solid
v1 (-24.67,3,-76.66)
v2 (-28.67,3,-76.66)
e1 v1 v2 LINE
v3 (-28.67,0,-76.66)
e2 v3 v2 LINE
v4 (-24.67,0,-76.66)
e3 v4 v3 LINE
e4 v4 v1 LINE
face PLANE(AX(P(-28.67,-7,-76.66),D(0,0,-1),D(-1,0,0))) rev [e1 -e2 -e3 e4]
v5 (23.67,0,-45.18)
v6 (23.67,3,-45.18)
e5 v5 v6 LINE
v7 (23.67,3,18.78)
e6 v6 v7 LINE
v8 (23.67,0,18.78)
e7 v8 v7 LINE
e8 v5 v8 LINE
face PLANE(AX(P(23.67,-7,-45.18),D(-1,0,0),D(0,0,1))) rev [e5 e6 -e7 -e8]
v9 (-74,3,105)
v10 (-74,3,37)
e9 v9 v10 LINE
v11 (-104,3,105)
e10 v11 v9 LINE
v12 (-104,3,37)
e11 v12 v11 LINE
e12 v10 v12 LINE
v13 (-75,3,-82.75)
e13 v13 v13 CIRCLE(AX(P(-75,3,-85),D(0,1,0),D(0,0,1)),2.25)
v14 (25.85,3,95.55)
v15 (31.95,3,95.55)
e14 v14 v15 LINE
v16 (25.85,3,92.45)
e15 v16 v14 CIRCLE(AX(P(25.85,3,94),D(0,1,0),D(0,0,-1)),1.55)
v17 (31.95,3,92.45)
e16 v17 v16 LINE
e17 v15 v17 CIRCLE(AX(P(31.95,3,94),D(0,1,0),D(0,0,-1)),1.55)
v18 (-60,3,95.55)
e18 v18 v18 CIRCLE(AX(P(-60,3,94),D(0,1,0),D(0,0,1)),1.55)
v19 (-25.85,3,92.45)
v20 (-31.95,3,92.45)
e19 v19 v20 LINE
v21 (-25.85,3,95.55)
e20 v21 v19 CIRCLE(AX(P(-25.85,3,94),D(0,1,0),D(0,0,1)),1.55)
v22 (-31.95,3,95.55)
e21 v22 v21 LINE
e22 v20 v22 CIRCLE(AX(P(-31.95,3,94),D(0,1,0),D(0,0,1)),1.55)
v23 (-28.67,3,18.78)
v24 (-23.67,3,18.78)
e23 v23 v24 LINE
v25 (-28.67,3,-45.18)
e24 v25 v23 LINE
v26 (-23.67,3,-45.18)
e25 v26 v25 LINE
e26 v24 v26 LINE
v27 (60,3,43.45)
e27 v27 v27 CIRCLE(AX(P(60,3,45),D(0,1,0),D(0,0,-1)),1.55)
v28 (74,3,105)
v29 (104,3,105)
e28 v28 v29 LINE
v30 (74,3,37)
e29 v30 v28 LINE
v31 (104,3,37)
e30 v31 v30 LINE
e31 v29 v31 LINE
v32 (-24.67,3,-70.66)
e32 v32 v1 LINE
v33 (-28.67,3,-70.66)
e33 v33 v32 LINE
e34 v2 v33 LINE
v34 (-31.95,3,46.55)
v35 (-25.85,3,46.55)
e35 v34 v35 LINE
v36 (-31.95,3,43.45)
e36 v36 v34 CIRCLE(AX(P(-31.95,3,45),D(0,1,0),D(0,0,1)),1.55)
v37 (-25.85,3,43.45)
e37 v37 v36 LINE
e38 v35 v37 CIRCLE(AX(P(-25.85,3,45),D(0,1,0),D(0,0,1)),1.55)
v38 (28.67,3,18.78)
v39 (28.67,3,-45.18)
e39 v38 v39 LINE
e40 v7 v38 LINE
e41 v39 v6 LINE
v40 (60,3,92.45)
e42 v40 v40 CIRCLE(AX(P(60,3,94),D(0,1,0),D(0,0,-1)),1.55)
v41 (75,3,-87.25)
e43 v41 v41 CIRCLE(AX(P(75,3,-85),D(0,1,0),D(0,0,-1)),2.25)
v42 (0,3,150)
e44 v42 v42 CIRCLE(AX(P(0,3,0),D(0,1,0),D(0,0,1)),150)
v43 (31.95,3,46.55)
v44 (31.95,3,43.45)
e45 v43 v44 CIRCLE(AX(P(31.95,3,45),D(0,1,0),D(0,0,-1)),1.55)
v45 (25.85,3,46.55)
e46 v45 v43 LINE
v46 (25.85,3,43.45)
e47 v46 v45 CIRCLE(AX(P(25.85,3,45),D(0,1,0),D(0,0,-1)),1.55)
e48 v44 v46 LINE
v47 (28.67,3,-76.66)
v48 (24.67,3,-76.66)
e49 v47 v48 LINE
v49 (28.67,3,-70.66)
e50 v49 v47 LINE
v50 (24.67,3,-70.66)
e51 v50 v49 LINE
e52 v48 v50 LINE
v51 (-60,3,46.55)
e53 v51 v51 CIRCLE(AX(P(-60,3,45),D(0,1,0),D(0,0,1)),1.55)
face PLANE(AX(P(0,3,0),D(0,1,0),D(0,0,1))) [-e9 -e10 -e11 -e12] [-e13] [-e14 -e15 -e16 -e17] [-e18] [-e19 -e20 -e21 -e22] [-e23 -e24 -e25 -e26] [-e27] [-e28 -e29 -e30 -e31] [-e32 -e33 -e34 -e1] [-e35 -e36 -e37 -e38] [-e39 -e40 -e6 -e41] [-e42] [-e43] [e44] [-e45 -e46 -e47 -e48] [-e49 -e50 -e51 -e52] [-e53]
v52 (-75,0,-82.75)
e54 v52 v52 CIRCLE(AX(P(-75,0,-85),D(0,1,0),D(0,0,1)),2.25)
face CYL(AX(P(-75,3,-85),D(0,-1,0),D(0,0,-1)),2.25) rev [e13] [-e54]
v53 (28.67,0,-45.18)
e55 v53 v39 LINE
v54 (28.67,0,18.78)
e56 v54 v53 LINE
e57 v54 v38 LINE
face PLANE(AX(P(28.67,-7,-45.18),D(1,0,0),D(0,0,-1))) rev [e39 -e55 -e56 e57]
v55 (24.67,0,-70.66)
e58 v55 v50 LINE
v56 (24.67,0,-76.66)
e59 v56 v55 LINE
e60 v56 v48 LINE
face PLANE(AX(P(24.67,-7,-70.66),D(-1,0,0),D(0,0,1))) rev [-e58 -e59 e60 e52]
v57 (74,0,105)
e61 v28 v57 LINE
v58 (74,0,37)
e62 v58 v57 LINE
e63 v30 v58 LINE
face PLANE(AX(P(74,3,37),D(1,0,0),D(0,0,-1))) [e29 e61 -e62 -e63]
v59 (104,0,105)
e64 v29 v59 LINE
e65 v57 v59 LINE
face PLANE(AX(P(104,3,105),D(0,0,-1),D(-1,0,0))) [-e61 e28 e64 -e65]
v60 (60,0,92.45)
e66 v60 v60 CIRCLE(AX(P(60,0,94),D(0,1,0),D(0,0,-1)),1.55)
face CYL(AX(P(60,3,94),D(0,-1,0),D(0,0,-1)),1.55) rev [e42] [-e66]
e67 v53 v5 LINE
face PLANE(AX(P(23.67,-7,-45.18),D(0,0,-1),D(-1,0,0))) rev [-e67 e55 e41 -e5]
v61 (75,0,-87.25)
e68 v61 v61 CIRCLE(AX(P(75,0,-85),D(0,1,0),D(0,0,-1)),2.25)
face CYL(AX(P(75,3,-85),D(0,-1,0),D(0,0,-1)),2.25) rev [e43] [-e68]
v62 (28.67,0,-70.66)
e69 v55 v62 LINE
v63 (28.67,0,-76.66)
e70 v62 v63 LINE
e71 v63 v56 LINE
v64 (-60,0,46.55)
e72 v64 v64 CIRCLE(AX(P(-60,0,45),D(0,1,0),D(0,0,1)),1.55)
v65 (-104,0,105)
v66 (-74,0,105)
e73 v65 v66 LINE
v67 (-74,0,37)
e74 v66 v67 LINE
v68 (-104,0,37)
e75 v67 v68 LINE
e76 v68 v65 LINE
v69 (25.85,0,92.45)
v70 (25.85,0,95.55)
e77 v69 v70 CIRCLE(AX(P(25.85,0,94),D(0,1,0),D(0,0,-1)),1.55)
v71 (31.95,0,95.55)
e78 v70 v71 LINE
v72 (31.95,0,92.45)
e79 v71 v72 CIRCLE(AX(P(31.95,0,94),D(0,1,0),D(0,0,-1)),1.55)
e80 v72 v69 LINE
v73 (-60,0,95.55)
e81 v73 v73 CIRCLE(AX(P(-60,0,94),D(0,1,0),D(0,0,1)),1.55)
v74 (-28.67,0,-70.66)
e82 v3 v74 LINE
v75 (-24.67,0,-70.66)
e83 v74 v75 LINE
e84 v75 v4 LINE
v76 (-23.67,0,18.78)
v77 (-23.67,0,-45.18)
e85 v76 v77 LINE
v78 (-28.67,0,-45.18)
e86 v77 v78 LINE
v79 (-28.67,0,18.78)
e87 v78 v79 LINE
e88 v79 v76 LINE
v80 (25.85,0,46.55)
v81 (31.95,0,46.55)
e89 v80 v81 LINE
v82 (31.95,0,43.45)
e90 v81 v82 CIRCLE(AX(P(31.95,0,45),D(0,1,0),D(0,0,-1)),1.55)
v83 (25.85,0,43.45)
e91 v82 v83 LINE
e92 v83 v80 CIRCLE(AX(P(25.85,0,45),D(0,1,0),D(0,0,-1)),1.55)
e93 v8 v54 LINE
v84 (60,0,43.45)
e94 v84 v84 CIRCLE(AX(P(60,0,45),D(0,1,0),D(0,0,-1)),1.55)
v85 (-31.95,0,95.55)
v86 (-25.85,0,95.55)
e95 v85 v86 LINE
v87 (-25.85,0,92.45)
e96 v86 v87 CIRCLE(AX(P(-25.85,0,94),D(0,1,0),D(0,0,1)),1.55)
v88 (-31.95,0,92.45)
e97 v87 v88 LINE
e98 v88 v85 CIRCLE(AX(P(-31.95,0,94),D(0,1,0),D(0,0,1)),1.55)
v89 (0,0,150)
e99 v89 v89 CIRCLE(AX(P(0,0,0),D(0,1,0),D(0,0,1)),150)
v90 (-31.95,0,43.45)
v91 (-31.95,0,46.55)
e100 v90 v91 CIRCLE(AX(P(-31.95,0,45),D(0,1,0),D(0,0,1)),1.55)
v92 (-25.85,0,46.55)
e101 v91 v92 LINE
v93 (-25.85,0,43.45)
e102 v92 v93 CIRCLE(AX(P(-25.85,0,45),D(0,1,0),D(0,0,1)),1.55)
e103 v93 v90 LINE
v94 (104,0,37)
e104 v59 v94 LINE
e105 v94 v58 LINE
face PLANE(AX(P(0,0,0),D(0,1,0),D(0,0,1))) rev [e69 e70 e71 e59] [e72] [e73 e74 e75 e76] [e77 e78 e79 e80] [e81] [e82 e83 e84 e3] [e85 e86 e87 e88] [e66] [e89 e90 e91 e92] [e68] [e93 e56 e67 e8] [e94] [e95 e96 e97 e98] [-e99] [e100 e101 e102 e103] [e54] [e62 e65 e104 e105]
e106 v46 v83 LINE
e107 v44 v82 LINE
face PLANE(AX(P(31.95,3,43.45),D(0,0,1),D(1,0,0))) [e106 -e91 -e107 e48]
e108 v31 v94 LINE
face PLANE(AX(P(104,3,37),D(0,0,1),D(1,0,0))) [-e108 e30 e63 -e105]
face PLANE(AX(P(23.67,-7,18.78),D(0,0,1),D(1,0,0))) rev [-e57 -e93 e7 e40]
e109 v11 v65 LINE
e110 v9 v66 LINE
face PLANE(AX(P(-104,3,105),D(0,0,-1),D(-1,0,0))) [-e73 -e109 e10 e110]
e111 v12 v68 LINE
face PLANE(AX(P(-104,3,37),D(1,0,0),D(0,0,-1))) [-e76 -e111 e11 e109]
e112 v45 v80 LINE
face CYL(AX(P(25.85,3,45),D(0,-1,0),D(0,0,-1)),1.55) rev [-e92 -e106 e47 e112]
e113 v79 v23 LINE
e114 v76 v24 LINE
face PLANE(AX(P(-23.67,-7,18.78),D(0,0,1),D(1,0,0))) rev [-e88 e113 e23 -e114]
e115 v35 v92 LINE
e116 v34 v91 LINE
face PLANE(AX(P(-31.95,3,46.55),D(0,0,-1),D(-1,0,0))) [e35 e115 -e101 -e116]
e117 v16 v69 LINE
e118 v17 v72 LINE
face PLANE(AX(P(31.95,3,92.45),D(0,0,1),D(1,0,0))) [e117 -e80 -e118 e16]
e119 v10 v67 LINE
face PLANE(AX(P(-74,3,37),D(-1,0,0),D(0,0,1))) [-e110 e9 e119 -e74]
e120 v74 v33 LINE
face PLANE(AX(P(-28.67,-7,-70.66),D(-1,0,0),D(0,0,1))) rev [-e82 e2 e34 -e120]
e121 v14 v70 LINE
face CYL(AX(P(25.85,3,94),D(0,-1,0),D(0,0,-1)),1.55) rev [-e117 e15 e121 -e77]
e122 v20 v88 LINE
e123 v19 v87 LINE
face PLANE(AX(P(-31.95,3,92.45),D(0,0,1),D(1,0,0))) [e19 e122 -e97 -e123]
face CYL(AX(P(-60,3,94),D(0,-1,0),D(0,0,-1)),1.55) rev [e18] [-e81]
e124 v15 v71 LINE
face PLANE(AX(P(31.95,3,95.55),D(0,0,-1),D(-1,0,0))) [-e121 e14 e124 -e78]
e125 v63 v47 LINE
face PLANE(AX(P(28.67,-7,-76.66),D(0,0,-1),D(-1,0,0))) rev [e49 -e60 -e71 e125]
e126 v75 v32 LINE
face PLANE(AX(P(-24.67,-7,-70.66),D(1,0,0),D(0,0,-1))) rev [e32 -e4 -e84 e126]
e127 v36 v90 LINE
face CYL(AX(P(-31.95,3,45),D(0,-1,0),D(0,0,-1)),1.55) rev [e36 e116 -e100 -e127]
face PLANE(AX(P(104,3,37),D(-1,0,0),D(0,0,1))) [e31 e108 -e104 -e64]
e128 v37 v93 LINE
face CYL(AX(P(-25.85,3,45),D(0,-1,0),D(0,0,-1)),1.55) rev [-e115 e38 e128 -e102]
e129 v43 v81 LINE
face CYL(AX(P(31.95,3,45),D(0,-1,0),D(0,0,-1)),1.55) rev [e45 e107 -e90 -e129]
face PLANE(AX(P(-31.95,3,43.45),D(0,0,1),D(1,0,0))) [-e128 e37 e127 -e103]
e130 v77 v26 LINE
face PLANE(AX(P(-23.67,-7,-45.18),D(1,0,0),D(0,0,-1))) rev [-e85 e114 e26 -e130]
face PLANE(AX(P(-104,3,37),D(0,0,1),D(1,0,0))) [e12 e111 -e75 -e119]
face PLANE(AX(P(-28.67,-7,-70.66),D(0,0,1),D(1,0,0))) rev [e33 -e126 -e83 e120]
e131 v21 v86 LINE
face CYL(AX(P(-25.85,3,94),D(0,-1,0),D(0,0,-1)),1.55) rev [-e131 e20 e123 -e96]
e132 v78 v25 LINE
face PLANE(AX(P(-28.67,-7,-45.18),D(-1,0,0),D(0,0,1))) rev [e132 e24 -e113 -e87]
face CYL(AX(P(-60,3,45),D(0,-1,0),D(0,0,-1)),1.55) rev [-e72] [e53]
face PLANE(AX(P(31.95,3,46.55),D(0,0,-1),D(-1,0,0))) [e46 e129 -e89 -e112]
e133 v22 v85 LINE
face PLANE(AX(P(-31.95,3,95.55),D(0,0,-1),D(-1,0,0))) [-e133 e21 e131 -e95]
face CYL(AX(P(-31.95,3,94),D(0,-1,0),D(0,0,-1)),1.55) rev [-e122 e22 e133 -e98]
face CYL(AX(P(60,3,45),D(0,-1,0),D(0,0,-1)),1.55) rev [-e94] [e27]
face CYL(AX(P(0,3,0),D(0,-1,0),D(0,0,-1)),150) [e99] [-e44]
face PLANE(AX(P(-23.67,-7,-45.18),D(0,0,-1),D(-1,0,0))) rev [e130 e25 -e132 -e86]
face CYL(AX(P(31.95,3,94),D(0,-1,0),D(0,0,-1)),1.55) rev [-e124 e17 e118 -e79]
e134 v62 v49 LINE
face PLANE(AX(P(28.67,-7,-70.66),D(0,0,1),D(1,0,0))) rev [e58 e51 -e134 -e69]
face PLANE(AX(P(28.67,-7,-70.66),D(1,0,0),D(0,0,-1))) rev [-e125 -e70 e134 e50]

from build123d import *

# Parameters (mm, degrees)
BOSS_EXTRUDE1_OUTLINE_R   = 150
BOSS_EXTRUDE1_OUTLINE_R_2 = 1.55
BOSS_EXTRUDE1_OUTLINE_W   = 30
BOSS_EXTRUDE1_OUTLINE_H   = 68
BOSS_EXTRUDE1_OUTLINE_R_3 = 2.25
BOSS_EXTRUDE1_DEPTH       = 3
SKETCH3_W                 = 5
SKETCH3_H                 = 63.96
SKETCH3_W_2               = 4
SKETCH3_H_2               = 6
CUT_EXTRUDE1_DEPTH        = 10


# Read off the part's stored shape, not the designer's step: Boss-Extrude1
with BuildPart() as part:
    # Boss-Extrude1 outline → Boss-Extrude1 (new body)
    with BuildSketch(Plane(origin=(0, 0, 0), x_dir=(1, 0, 0), z_dir=(0, 1, 0))):
        Circle(BOSS_EXTRUDE1_OUTLINE_R)
        with Locations((-60, -94)):
            Circle(BOSS_EXTRUDE1_OUTLINE_R_2, mode=Mode.SUBTRACT)
        with BuildLine():
            Line((-25.85, -95.55), (-31.95, -95.55))
            ThreePointArc((-31.95, -95.55), (-33.5, -94), (-31.95, -92.45))
            Line((-31.95, -92.45), (-25.85, -92.45))
            ThreePointArc((-25.85, -92.45), (-24.3, -94), (-25.85, -95.55))
        make_face(mode=Mode.SUBTRACT)
        with Locations((-89, -71)):
            Rectangle(BOSS_EXTRUDE1_OUTLINE_W, BOSS_EXTRUDE1_OUTLINE_H, mode=Mode.SUBTRACT)
        with Locations((-60, -45)):
            Circle(BOSS_EXTRUDE1_OUTLINE_R_2, mode=Mode.SUBTRACT)
        with BuildLine():
            Line((-25.85, -46.55), (-31.95, -46.55))
            ThreePointArc((-31.95, -46.55), (-33.5, -45), (-31.95, -43.45))
            Line((-31.95, -43.45), (-25.85, -43.45))
            ThreePointArc((-25.85, -43.45), (-24.3, -45), (-25.85, -46.55))
        make_face(mode=Mode.SUBTRACT)
        with BuildLine():
            Line((25.85, -92.45), (31.95, -92.45))
            ThreePointArc((31.95, -92.45), (33.5, -94), (31.95, -95.55))
            Line((31.95, -95.55), (25.85, -95.55))
            ThreePointArc((25.85, -95.55), (24.3, -94), (25.85, -92.45))
        make_face(mode=Mode.SUBTRACT)
        with Locations((60, -94)):
            Circle(BOSS_EXTRUDE1_OUTLINE_R_2, mode=Mode.SUBTRACT)
        with BuildLine():
            Line((25.85, -43.45), (31.95, -43.45))
            ThreePointArc((31.95, -43.45), (33.5, -45), (31.95, -46.55))
            Line((31.95, -46.55), (25.85, -46.55))
            ThreePointArc((25.85, -46.55), (24.3, -45), (25.85, -43.45))
        make_face(mode=Mode.SUBTRACT)
        with Locations((60, -45)):
            Circle(BOSS_EXTRUDE1_OUTLINE_R_2, mode=Mode.SUBTRACT)
        with Locations((89, -71)):
            Rectangle(BOSS_EXTRUDE1_OUTLINE_W, BOSS_EXTRUDE1_OUTLINE_H, mode=Mode.SUBTRACT)
        with Locations((-75, 85)):
            Circle(BOSS_EXTRUDE1_OUTLINE_R_3, mode=Mode.SUBTRACT)
        with Locations((75, 85)):
            Circle(BOSS_EXTRUDE1_OUTLINE_R_3, mode=Mode.SUBTRACT)
    extrude(amount=BOSS_EXTRUDE1_DEPTH)

    # Sketch3 → Cut-Extrude1 (cut)
    with BuildSketch(Plane(origin=(0, 3, 0), x_dir=(1, 0, 0), z_dir=(0, 1, 0))):
        with Locations((-26.17, 13.2)):
            Rectangle(SKETCH3_W, SKETCH3_H)
        with Locations((-26.67, 73.66)):
            Rectangle(SKETCH3_W_2, SKETCH3_H_2)
        with Locations((26.67, 73.66)):
            Rectangle(SKETCH3_W_2, SKETCH3_H_2)
        with Locations((26.17, 13.2)):
            Rectangle(SKETCH3_W, SKETCH3_H)
    extrude(amount=-CUT_EXTRUDE1_DEPTH, mode=Mode.SUBTRACT)


solid = part.part
